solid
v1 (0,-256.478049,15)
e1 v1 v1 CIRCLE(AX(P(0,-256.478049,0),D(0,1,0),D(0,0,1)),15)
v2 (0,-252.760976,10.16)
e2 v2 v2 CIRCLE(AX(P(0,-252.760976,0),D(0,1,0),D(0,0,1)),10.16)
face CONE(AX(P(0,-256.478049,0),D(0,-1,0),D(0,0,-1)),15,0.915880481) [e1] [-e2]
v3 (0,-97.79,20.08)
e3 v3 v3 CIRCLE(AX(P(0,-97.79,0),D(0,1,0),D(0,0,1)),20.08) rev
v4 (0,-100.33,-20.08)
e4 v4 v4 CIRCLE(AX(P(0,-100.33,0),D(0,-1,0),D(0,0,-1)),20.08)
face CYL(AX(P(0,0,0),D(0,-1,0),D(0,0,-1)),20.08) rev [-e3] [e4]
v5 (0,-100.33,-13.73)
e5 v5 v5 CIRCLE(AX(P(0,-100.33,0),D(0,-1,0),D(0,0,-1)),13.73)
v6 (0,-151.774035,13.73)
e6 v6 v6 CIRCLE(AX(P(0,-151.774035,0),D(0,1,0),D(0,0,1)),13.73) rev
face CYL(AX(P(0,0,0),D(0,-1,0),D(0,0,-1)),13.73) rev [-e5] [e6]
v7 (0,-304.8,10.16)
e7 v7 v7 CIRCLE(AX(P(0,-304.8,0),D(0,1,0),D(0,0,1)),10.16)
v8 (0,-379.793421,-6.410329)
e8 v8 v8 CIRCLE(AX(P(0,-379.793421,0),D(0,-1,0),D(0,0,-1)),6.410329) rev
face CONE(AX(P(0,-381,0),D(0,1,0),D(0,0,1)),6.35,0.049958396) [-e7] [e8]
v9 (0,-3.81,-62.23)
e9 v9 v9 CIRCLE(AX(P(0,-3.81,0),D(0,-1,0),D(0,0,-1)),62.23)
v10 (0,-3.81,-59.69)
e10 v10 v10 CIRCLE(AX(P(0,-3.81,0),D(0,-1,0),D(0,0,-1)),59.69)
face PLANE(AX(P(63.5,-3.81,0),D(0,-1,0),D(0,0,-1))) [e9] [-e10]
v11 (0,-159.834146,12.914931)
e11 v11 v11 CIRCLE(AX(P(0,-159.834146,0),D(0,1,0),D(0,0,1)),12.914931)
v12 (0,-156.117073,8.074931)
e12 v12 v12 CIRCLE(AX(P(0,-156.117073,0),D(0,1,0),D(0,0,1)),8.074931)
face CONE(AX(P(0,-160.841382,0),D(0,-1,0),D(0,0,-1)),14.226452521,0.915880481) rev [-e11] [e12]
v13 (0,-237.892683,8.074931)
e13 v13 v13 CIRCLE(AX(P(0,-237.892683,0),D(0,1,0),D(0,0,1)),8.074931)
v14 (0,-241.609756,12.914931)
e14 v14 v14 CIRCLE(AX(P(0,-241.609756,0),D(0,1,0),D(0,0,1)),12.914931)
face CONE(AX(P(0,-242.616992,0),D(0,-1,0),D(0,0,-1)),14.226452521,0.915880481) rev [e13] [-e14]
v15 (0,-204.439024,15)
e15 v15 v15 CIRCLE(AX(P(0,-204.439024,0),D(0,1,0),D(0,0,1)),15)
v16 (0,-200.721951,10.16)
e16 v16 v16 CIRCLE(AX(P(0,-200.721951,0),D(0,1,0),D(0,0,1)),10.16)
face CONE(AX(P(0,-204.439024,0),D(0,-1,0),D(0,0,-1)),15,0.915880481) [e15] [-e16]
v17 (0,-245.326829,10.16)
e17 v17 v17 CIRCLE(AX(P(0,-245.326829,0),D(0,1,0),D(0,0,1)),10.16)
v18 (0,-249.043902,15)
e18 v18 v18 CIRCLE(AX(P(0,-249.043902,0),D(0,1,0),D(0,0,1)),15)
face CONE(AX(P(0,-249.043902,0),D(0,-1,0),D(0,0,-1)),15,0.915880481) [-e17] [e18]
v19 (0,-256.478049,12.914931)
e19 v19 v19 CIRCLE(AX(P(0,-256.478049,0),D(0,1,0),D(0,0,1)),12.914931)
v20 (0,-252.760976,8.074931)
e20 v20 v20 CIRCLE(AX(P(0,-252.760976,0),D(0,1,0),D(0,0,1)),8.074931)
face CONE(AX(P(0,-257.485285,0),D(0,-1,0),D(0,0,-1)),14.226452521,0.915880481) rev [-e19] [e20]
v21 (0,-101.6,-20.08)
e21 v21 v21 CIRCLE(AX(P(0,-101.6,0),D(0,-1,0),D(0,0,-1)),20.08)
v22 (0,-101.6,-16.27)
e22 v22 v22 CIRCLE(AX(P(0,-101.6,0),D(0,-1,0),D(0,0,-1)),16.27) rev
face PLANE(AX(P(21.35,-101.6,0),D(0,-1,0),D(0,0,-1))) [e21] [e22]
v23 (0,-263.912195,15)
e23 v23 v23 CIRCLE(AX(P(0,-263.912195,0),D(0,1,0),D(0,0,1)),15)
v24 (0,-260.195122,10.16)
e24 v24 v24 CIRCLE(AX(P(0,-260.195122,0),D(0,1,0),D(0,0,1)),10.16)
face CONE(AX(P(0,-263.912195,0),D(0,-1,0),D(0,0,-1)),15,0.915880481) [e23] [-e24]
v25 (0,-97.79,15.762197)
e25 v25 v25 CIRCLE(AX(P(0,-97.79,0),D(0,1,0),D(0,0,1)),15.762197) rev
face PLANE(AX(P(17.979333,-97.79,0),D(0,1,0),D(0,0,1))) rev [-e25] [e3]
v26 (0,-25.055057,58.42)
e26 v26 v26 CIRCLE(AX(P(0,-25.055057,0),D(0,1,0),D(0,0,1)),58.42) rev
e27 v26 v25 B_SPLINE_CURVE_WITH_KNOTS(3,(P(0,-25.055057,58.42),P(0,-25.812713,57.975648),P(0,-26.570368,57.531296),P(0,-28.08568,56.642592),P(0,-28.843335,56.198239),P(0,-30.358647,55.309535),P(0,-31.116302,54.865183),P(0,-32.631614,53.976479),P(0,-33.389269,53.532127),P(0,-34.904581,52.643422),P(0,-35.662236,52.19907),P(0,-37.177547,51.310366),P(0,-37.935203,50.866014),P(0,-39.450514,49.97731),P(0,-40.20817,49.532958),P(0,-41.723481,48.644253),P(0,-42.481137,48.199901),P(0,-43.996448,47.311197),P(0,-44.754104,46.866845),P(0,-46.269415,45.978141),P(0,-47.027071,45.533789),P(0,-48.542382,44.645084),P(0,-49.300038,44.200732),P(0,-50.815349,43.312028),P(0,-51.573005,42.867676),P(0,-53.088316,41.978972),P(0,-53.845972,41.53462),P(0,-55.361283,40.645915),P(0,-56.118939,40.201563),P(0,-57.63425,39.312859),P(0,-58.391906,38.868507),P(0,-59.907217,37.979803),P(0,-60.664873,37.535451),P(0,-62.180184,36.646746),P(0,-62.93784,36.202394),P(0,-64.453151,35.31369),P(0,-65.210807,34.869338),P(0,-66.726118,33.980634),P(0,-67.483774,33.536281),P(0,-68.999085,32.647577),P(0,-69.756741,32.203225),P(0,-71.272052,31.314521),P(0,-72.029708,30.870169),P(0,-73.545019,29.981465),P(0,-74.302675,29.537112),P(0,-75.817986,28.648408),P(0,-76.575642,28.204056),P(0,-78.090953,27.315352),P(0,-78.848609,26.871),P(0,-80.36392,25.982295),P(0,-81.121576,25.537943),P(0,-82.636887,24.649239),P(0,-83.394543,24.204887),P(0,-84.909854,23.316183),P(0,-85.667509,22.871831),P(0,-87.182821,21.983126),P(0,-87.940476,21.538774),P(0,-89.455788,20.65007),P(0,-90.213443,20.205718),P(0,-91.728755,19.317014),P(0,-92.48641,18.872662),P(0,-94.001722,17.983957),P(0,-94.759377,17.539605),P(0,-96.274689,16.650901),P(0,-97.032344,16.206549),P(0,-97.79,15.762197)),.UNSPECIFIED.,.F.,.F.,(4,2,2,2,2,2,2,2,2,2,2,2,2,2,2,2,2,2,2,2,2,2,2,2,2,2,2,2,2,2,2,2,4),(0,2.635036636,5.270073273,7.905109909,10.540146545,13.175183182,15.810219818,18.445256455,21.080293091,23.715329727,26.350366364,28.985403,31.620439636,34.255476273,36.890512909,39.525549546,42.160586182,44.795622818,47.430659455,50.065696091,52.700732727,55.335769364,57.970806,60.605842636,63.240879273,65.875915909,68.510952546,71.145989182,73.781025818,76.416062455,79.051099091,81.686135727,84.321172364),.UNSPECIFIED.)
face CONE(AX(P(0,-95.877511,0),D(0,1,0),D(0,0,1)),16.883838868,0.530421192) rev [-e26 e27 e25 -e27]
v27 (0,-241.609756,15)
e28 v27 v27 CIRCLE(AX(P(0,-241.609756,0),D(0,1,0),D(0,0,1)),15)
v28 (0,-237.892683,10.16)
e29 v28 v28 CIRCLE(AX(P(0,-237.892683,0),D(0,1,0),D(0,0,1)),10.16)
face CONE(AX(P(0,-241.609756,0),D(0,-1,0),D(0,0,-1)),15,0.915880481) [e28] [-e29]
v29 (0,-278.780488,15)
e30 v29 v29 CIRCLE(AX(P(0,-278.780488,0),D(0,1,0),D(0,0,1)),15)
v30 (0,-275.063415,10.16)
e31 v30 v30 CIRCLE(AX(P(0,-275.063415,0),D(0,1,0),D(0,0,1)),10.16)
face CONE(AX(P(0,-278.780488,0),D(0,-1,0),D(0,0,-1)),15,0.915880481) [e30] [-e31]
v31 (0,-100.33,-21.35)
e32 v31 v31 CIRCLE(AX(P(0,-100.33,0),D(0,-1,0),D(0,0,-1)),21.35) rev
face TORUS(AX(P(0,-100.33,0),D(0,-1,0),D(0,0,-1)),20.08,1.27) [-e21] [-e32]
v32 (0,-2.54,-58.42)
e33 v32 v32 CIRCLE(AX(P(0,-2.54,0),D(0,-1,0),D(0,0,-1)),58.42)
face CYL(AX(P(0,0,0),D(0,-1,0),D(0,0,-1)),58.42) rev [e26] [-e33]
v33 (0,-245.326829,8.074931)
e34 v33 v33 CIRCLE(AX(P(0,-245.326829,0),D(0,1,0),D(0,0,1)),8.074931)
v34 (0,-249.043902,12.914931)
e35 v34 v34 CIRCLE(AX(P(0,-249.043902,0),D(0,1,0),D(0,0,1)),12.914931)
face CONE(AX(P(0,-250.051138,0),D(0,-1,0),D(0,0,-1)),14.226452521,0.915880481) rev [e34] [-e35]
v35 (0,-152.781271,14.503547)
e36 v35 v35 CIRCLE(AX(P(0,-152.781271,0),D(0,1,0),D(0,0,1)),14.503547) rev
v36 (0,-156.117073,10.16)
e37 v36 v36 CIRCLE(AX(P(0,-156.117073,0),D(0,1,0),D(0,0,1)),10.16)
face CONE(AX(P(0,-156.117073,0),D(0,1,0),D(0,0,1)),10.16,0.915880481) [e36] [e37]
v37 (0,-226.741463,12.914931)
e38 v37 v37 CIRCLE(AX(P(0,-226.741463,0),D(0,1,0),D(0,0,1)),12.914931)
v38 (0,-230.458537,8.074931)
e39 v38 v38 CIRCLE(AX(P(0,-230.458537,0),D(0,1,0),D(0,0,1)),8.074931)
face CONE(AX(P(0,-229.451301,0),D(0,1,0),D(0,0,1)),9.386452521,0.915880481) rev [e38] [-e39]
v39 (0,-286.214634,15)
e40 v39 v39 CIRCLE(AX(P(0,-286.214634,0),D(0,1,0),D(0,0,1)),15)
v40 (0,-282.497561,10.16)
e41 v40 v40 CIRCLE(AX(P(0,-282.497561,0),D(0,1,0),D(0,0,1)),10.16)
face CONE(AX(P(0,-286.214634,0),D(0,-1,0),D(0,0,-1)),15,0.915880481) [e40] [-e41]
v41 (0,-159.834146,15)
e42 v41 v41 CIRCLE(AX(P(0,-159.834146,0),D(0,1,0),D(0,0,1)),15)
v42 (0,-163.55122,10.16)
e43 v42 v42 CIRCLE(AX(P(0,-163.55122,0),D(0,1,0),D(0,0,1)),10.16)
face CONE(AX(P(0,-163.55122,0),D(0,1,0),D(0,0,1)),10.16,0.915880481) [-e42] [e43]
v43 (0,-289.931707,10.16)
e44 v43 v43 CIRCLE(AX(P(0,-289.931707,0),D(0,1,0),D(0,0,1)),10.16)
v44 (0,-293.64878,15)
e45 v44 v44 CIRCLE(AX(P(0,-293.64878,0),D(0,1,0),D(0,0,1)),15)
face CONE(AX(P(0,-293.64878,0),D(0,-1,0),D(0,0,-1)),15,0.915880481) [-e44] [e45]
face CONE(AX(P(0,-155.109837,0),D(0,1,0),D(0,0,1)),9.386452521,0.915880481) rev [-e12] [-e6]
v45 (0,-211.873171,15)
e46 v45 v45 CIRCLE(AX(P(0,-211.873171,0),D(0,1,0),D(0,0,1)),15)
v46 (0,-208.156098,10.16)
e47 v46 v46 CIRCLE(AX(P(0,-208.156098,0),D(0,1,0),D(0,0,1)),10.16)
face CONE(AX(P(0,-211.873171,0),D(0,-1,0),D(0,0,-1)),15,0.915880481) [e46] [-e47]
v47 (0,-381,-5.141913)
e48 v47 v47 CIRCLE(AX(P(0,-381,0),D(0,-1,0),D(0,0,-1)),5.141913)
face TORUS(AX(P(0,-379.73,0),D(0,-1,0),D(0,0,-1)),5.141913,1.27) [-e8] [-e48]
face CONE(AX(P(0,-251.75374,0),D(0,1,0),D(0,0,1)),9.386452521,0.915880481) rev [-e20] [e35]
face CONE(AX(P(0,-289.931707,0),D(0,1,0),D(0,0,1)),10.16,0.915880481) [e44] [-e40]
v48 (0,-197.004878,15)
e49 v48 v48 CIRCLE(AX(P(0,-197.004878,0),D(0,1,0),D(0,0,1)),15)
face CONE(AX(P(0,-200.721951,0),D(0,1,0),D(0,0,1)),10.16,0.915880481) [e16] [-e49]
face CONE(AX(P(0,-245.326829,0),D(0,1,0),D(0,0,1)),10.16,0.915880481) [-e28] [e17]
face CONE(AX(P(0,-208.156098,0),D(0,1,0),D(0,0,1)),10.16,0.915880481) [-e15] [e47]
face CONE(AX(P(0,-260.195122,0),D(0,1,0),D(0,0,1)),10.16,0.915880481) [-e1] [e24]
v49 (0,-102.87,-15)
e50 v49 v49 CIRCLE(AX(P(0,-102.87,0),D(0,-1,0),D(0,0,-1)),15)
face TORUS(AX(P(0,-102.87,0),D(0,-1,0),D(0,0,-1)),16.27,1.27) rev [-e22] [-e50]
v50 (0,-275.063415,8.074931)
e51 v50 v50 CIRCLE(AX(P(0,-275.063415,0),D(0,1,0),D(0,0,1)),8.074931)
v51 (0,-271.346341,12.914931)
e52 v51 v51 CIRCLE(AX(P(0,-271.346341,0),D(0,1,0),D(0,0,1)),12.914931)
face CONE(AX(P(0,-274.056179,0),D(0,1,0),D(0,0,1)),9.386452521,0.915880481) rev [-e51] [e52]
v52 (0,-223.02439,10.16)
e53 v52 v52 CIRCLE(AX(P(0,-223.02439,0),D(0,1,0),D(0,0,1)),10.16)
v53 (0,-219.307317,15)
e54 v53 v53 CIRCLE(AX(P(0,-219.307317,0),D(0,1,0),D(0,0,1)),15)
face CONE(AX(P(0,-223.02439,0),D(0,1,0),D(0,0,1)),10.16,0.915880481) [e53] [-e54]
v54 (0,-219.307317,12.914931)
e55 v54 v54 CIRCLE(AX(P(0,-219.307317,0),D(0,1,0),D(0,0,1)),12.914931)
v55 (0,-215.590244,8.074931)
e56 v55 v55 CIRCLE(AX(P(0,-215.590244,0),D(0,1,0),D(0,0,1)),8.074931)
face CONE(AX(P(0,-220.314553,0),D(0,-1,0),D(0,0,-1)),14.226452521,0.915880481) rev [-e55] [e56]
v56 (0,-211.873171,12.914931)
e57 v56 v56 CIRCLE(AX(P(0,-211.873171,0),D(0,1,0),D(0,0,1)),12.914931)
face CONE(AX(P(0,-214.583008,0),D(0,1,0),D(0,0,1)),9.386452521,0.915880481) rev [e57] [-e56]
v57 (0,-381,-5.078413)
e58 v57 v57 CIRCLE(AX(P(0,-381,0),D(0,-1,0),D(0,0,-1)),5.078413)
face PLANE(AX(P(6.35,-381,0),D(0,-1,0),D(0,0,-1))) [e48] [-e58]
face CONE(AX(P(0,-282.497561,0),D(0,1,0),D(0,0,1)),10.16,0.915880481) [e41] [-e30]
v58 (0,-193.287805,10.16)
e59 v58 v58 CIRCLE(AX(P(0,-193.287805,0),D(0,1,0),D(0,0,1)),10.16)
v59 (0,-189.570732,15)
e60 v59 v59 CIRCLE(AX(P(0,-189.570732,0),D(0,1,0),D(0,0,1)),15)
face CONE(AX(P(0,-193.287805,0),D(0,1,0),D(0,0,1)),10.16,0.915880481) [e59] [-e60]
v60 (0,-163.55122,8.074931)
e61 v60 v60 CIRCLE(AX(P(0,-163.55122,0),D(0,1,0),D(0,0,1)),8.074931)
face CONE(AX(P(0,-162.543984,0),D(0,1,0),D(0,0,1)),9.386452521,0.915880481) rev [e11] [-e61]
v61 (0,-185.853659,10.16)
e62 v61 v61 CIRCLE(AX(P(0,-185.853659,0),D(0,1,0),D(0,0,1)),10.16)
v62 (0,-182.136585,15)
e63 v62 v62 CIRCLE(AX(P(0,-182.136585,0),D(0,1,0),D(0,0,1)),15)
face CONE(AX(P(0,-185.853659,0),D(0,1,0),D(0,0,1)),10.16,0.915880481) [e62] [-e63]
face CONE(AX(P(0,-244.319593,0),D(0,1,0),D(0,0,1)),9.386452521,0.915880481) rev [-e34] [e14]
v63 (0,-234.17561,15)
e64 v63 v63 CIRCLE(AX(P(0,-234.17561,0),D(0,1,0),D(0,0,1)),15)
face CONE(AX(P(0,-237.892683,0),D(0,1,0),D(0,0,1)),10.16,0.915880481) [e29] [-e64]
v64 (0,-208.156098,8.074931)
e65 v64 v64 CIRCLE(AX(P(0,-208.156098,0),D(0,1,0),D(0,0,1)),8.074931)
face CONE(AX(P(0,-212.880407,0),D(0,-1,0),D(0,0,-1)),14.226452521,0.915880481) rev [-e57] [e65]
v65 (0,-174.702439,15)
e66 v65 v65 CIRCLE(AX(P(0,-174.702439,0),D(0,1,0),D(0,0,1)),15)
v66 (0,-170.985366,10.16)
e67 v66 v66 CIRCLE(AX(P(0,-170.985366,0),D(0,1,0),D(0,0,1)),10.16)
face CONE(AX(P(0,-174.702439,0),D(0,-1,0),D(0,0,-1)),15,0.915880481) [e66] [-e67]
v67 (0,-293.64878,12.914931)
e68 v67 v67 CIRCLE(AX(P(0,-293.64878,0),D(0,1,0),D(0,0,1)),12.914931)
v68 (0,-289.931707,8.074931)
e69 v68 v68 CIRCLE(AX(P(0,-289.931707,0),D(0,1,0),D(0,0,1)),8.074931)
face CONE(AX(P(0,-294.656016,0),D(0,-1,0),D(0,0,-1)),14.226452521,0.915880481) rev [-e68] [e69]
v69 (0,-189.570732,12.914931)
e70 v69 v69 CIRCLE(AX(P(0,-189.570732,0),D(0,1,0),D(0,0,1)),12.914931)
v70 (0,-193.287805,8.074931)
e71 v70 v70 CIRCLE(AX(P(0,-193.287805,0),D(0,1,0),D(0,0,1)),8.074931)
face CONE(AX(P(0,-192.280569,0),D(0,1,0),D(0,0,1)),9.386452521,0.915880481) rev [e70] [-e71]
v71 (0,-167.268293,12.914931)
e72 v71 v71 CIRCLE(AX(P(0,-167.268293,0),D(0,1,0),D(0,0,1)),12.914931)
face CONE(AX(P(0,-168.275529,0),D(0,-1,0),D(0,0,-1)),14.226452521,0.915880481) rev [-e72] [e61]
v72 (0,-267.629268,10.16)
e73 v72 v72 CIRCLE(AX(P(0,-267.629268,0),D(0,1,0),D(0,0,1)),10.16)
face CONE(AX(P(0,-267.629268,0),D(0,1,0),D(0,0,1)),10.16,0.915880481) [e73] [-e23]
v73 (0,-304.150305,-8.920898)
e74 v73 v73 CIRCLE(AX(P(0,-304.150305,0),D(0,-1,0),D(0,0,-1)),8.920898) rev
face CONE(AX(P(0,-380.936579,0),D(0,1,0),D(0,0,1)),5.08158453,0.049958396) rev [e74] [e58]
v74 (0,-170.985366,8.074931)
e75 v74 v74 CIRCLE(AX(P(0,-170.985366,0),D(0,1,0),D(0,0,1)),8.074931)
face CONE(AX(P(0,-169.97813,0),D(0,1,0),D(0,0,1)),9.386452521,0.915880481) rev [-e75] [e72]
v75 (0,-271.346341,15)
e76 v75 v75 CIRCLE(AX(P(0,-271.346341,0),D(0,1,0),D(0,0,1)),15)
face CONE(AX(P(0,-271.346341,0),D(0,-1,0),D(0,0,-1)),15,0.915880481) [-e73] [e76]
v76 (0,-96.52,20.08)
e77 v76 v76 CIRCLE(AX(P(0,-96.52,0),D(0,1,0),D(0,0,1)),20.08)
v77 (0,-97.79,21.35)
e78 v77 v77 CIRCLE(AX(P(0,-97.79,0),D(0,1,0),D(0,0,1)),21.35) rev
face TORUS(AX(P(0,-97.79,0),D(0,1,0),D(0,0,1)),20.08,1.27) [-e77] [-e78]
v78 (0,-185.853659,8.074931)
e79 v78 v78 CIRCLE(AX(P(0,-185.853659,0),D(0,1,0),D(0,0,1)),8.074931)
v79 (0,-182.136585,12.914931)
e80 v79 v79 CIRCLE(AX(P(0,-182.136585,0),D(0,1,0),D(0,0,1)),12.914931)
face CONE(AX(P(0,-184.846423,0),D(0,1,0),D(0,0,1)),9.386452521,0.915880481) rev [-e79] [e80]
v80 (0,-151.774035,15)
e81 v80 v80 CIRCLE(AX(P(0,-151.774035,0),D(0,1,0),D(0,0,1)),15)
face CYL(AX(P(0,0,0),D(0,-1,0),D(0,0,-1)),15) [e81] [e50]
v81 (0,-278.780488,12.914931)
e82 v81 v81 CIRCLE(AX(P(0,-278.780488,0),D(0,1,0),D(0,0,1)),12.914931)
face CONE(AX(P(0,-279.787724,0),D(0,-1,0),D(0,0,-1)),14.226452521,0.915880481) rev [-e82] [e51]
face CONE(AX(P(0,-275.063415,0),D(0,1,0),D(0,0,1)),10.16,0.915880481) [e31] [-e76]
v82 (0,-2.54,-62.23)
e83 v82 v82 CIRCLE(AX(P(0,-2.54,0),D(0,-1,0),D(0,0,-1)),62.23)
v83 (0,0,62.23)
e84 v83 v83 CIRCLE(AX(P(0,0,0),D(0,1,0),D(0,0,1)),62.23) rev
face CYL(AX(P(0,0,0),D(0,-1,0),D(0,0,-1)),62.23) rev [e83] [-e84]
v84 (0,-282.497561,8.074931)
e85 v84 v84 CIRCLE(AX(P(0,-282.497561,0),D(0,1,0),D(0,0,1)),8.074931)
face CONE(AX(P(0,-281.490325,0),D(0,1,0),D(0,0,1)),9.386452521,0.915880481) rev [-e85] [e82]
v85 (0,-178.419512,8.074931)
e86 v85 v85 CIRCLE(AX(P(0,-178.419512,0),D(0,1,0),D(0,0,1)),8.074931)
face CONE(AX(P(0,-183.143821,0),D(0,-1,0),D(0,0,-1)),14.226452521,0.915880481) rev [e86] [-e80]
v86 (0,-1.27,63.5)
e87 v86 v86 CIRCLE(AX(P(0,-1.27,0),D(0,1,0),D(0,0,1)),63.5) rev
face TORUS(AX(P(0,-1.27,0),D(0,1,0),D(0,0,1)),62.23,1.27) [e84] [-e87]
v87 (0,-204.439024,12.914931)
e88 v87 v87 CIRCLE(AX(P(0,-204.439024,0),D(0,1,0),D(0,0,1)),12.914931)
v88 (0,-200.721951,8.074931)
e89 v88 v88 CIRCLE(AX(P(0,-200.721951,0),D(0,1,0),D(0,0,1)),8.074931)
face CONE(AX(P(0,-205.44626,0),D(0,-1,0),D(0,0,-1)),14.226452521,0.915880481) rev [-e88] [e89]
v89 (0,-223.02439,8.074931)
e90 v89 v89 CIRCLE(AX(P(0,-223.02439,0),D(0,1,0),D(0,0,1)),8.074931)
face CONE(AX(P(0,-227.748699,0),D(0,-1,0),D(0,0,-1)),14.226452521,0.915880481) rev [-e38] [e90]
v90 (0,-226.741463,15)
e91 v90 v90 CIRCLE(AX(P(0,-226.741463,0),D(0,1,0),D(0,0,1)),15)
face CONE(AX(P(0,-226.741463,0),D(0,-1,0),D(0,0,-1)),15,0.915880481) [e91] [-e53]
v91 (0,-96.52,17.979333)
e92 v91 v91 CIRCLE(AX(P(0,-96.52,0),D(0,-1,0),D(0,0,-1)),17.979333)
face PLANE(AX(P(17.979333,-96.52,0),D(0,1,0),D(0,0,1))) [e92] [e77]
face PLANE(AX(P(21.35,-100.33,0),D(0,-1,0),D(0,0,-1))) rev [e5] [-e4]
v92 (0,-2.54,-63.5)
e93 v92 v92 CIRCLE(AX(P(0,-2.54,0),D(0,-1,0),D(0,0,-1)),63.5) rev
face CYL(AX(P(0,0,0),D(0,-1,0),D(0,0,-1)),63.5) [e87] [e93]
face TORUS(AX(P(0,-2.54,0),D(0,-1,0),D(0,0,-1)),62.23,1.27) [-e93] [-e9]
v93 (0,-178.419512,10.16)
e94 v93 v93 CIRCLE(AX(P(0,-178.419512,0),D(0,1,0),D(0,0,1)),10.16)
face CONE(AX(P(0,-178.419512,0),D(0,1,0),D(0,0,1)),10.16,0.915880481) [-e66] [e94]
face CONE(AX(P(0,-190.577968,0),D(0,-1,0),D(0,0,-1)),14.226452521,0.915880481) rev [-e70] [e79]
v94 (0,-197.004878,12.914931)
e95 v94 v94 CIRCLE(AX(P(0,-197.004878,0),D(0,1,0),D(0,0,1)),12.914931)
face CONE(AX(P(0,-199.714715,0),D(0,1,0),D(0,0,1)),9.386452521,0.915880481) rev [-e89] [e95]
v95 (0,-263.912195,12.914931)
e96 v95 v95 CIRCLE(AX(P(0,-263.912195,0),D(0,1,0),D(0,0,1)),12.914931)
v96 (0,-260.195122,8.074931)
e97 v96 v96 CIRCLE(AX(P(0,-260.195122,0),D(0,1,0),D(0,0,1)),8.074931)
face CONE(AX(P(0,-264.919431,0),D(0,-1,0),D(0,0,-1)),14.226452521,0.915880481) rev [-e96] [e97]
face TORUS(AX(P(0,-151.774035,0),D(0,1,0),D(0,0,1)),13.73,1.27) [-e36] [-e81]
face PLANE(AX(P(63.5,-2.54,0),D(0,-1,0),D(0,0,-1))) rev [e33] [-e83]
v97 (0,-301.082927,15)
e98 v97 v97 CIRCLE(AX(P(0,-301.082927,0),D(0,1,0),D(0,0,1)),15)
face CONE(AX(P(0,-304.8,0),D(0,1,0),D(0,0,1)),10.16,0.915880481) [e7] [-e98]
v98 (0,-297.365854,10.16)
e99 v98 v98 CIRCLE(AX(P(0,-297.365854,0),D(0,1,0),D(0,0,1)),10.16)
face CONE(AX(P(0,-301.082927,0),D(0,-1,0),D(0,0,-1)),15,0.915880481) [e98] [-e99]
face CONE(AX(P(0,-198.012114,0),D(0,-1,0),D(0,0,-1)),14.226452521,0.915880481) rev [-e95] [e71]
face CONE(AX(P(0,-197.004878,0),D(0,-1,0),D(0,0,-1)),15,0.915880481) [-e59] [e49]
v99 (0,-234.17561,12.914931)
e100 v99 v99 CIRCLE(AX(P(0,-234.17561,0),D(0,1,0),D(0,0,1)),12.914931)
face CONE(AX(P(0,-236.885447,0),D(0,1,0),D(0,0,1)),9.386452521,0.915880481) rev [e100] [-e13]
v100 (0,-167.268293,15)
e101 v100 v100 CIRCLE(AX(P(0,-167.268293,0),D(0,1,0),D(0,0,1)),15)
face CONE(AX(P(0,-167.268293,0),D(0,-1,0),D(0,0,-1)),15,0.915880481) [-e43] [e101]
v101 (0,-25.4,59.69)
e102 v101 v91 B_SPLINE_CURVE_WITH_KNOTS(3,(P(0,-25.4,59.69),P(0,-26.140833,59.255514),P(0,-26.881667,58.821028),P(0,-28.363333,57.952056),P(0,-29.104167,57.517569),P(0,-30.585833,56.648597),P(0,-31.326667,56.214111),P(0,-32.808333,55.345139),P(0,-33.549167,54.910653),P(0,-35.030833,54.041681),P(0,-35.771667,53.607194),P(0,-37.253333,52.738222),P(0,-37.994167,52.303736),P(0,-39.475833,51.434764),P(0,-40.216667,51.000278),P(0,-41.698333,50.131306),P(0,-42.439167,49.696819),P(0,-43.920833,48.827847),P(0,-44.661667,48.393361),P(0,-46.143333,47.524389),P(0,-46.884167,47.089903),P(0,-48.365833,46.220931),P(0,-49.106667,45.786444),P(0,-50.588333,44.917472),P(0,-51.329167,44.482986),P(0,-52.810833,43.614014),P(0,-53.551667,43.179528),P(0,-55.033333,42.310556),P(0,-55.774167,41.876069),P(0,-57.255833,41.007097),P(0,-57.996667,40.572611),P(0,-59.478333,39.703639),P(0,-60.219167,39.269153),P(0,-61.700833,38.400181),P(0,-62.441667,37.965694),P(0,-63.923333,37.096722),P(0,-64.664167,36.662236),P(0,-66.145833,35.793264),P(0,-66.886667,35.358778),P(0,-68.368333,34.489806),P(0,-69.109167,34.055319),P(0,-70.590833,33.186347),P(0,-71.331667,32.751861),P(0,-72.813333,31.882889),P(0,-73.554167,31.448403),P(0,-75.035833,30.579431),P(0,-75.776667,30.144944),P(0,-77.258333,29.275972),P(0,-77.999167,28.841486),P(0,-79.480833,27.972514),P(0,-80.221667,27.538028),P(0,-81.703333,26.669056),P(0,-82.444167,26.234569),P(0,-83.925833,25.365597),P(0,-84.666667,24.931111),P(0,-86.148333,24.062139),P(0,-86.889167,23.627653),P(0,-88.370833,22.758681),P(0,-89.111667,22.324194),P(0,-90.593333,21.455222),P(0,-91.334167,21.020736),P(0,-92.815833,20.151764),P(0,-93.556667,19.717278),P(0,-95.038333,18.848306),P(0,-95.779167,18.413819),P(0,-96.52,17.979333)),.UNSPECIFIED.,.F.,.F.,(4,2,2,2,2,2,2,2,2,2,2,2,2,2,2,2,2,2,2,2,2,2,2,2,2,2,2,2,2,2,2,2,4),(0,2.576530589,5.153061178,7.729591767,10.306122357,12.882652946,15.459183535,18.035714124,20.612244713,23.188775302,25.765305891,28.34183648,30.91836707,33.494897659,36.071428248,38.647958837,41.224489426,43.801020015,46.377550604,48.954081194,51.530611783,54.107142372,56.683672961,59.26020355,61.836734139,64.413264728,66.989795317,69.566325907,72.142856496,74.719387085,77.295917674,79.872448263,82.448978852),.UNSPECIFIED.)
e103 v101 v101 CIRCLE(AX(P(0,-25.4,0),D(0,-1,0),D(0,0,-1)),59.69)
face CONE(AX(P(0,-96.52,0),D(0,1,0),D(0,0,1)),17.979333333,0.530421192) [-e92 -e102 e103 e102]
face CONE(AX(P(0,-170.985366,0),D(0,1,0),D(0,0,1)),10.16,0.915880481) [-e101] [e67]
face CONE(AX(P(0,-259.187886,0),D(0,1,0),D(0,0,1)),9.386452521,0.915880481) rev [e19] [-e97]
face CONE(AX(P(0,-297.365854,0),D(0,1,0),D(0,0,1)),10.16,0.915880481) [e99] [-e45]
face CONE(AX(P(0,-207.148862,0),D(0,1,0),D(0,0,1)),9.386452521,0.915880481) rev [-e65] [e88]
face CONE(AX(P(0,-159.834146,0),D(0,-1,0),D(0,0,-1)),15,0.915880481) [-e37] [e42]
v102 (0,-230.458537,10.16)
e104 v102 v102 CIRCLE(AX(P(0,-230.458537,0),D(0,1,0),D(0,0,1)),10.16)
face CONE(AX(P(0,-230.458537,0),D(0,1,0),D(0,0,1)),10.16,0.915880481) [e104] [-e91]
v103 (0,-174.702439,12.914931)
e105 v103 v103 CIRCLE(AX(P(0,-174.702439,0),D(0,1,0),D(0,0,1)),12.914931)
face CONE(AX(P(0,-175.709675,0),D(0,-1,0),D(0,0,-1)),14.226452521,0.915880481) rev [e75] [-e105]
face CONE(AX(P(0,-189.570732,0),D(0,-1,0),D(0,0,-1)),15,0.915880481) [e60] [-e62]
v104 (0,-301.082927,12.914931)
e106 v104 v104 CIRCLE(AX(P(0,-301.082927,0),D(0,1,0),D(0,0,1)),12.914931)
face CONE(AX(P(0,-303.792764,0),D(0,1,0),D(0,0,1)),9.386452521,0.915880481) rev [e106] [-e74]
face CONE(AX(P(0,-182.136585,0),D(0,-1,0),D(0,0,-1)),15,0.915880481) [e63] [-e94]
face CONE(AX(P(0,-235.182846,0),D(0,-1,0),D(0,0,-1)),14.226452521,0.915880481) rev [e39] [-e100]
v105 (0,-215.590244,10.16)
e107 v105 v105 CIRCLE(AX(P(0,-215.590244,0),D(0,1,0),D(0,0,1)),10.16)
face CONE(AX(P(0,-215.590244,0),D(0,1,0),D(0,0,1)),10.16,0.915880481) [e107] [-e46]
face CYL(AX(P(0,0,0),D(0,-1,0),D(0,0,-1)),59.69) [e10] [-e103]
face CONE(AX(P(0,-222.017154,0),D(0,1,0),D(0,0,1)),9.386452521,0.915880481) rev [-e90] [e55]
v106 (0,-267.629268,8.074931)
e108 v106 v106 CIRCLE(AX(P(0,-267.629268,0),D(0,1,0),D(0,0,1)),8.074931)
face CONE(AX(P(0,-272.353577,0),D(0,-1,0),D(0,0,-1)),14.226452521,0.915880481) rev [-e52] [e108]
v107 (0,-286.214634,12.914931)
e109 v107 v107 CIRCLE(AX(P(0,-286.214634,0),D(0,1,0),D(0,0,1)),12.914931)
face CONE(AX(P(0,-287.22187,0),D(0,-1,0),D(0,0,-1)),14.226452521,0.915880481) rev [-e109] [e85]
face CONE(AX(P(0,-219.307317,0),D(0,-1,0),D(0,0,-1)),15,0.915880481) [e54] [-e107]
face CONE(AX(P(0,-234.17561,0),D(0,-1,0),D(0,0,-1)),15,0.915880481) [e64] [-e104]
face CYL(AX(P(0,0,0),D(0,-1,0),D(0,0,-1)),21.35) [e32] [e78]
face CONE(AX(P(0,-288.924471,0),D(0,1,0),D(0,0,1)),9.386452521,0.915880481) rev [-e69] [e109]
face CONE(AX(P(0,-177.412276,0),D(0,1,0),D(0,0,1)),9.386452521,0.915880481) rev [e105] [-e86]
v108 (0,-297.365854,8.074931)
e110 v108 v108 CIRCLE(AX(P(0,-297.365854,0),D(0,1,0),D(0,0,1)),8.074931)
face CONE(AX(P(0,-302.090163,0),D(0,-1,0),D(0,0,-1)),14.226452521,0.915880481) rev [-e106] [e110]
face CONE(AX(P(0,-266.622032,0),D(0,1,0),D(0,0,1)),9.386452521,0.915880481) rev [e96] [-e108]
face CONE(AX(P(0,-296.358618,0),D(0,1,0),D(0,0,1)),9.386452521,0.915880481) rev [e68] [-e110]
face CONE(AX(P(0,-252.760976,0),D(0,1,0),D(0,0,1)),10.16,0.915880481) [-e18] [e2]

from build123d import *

# Parameters (mm, degrees)
FILLET1_R = 1.27


# Read off the part's stored shape, not the designer's step: Shell1
with BuildPart() as part:
    # Sketch1 → Revolve1 (revolve)
    with BuildSketch(Plane.XY, mode=Mode.PRIVATE) as revolve1_sk:
        Polygon((0, 0), (63.5, 0), (63.5, -3.81), (59.69, -3.81), (59.69, -25.4), (17.979333333, -96.52), (21.35, -96.52), (21.35, -101.6), (15, -101.6), (15, -152.4), (10.16, -152.4), (10.16, -304.8), (6.35, -381), (0, -381), align=None)
    revolve(revolve1_sk.sketch.rotate(Axis((0, 0, 0), (0, 1, 0)), 90), axis=Axis((0, 0, 0), (0, 1, 0)))

    # Sketch3 → Revolve2 (revolve)
    with BuildSketch(Plane.XY, mode=Mode.PRIVATE) as revolve2_sk:
        Polygon((15, -152.4), (10.16, -156.117073171), (15, -159.834146341), (10.16, -163.551219512), (15, -167.268292683), (10.16, -170.985365854), (15, -174.702439024), (10.16, -178.419512195), (15, -182.136585366), (10.16, -185.853658537), (15, -189.570731707), (10.16, -193.287804878), (15, -197.004878049), (10.16, -200.72195122), (15, -204.43902439), (10.16, -208.156097561), (15, -211.873170732), (10.16, -215.590243902), (15, -219.307317073), (10.16, -223.024390244), (15, -226.741463415), (10.16, -230.458536585), (15, -234.175609756), (10.16, -237.892682927), (15, -241.609756098), (10.16, -245.326829268), (15, -249.043902439), (10.16, -252.76097561), (15, -256.47804878), (10.16, -260.195121951), (15, -263.912195122), (10.16, -267.629268293), (15, -271.346341463), (10.16, -275.063414634), (15, -278.780487805), (10.16, -282.497560976), (15, -286.214634146), (10.16, -289.931707317), (15, -293.648780488), (10.16, -297.365853659), (15, -301.082926829), (10.16, -304.8), (0, -304.8), (0, -152.4), align=None)
    revolve(revolve2_sk.sketch.rotate(Axis((0, -152.4, 0), (0, -1, 0)), 90), axis=Axis((0, -152.4, 0), (0, -1, 0)))

    # Shell1 outline → Shell1 (revolve, cut)
    with BuildSketch(Plane.XY):
        Polygon((5.078413491, -381), (8.92089823, -304.150305222), (12.91493083, -301.082926829), (8.07493083, -297.365853659), (12.91493083, -293.648780488), (8.07493083, -289.931707317), (12.91493083, -286.214634146), (8.07493083, -282.497560976), (12.91493083, -278.780487805), (8.07493083, -275.063414634), (12.91493083, -271.346341463), (8.07493083, -267.629268293), (12.91493083, -263.912195122), (8.07493083, -260.195121951), (12.91493083, -256.47804878), (8.07493083, -252.76097561), (12.91493083, -249.043902439), (8.07493083, -245.326829268), (12.91493083, -241.609756098), (8.07493083, -237.892682927), (12.91493083, -234.175609756), (8.07493083, -230.458536585), (12.91493083, -226.741463415), (8.07493083, -223.024390244), (12.91493083, -219.307317073), (8.07493083, -215.590243902), (12.91493083, -211.873170732), (8.07493083, -208.156097561), (12.91493083, -204.43902439), (8.07493083, -200.72195122), (12.91493083, -197.004878049), (8.07493083, -193.287804878), (12.91493083, -189.570731707), (8.07493083, -185.853658537), (12.91493083, -182.136585366), (8.07493083, -178.419512195), (12.91493083, -174.702439024), (8.07493083, -170.985365854), (12.91493083, -167.268292683), (8.07493083, -163.551219512), (12.91493083, -159.834146341), (8.07493083, -156.117073171), (13.73, -151.774034763), (13.73, -100.33), (20.08, -100.33), (20.08, -97.79), (15.762196806, -97.79), (58.42, -25.055056984), (58.42, -2.54), (62.23, -2.54), (62.23, 0), (0, 0), (0, -381), align=None)
    revolve(axis=Axis((0, 0, 0), (0, 1, 0)), mode=Mode.SUBTRACT)

    # Fillet1
    fillet1_edges = [part.edges().sort_by_distance(p)[0] for p in [
        (0, 0, 63.5),
        (0, -3.81, 63.5),
        (0, -96.52, 21.35),
        (0, -101.6, 21.35),
        (0, -101.6, 15),
        (-15, -152.4, 0),
        (0, -381, 6.35),
    ]]
    fillet(fillet1_edges, radius=FILLET1_R - 0.0001)  # a hair under: the kernel refuses the full size


solid = part.part
